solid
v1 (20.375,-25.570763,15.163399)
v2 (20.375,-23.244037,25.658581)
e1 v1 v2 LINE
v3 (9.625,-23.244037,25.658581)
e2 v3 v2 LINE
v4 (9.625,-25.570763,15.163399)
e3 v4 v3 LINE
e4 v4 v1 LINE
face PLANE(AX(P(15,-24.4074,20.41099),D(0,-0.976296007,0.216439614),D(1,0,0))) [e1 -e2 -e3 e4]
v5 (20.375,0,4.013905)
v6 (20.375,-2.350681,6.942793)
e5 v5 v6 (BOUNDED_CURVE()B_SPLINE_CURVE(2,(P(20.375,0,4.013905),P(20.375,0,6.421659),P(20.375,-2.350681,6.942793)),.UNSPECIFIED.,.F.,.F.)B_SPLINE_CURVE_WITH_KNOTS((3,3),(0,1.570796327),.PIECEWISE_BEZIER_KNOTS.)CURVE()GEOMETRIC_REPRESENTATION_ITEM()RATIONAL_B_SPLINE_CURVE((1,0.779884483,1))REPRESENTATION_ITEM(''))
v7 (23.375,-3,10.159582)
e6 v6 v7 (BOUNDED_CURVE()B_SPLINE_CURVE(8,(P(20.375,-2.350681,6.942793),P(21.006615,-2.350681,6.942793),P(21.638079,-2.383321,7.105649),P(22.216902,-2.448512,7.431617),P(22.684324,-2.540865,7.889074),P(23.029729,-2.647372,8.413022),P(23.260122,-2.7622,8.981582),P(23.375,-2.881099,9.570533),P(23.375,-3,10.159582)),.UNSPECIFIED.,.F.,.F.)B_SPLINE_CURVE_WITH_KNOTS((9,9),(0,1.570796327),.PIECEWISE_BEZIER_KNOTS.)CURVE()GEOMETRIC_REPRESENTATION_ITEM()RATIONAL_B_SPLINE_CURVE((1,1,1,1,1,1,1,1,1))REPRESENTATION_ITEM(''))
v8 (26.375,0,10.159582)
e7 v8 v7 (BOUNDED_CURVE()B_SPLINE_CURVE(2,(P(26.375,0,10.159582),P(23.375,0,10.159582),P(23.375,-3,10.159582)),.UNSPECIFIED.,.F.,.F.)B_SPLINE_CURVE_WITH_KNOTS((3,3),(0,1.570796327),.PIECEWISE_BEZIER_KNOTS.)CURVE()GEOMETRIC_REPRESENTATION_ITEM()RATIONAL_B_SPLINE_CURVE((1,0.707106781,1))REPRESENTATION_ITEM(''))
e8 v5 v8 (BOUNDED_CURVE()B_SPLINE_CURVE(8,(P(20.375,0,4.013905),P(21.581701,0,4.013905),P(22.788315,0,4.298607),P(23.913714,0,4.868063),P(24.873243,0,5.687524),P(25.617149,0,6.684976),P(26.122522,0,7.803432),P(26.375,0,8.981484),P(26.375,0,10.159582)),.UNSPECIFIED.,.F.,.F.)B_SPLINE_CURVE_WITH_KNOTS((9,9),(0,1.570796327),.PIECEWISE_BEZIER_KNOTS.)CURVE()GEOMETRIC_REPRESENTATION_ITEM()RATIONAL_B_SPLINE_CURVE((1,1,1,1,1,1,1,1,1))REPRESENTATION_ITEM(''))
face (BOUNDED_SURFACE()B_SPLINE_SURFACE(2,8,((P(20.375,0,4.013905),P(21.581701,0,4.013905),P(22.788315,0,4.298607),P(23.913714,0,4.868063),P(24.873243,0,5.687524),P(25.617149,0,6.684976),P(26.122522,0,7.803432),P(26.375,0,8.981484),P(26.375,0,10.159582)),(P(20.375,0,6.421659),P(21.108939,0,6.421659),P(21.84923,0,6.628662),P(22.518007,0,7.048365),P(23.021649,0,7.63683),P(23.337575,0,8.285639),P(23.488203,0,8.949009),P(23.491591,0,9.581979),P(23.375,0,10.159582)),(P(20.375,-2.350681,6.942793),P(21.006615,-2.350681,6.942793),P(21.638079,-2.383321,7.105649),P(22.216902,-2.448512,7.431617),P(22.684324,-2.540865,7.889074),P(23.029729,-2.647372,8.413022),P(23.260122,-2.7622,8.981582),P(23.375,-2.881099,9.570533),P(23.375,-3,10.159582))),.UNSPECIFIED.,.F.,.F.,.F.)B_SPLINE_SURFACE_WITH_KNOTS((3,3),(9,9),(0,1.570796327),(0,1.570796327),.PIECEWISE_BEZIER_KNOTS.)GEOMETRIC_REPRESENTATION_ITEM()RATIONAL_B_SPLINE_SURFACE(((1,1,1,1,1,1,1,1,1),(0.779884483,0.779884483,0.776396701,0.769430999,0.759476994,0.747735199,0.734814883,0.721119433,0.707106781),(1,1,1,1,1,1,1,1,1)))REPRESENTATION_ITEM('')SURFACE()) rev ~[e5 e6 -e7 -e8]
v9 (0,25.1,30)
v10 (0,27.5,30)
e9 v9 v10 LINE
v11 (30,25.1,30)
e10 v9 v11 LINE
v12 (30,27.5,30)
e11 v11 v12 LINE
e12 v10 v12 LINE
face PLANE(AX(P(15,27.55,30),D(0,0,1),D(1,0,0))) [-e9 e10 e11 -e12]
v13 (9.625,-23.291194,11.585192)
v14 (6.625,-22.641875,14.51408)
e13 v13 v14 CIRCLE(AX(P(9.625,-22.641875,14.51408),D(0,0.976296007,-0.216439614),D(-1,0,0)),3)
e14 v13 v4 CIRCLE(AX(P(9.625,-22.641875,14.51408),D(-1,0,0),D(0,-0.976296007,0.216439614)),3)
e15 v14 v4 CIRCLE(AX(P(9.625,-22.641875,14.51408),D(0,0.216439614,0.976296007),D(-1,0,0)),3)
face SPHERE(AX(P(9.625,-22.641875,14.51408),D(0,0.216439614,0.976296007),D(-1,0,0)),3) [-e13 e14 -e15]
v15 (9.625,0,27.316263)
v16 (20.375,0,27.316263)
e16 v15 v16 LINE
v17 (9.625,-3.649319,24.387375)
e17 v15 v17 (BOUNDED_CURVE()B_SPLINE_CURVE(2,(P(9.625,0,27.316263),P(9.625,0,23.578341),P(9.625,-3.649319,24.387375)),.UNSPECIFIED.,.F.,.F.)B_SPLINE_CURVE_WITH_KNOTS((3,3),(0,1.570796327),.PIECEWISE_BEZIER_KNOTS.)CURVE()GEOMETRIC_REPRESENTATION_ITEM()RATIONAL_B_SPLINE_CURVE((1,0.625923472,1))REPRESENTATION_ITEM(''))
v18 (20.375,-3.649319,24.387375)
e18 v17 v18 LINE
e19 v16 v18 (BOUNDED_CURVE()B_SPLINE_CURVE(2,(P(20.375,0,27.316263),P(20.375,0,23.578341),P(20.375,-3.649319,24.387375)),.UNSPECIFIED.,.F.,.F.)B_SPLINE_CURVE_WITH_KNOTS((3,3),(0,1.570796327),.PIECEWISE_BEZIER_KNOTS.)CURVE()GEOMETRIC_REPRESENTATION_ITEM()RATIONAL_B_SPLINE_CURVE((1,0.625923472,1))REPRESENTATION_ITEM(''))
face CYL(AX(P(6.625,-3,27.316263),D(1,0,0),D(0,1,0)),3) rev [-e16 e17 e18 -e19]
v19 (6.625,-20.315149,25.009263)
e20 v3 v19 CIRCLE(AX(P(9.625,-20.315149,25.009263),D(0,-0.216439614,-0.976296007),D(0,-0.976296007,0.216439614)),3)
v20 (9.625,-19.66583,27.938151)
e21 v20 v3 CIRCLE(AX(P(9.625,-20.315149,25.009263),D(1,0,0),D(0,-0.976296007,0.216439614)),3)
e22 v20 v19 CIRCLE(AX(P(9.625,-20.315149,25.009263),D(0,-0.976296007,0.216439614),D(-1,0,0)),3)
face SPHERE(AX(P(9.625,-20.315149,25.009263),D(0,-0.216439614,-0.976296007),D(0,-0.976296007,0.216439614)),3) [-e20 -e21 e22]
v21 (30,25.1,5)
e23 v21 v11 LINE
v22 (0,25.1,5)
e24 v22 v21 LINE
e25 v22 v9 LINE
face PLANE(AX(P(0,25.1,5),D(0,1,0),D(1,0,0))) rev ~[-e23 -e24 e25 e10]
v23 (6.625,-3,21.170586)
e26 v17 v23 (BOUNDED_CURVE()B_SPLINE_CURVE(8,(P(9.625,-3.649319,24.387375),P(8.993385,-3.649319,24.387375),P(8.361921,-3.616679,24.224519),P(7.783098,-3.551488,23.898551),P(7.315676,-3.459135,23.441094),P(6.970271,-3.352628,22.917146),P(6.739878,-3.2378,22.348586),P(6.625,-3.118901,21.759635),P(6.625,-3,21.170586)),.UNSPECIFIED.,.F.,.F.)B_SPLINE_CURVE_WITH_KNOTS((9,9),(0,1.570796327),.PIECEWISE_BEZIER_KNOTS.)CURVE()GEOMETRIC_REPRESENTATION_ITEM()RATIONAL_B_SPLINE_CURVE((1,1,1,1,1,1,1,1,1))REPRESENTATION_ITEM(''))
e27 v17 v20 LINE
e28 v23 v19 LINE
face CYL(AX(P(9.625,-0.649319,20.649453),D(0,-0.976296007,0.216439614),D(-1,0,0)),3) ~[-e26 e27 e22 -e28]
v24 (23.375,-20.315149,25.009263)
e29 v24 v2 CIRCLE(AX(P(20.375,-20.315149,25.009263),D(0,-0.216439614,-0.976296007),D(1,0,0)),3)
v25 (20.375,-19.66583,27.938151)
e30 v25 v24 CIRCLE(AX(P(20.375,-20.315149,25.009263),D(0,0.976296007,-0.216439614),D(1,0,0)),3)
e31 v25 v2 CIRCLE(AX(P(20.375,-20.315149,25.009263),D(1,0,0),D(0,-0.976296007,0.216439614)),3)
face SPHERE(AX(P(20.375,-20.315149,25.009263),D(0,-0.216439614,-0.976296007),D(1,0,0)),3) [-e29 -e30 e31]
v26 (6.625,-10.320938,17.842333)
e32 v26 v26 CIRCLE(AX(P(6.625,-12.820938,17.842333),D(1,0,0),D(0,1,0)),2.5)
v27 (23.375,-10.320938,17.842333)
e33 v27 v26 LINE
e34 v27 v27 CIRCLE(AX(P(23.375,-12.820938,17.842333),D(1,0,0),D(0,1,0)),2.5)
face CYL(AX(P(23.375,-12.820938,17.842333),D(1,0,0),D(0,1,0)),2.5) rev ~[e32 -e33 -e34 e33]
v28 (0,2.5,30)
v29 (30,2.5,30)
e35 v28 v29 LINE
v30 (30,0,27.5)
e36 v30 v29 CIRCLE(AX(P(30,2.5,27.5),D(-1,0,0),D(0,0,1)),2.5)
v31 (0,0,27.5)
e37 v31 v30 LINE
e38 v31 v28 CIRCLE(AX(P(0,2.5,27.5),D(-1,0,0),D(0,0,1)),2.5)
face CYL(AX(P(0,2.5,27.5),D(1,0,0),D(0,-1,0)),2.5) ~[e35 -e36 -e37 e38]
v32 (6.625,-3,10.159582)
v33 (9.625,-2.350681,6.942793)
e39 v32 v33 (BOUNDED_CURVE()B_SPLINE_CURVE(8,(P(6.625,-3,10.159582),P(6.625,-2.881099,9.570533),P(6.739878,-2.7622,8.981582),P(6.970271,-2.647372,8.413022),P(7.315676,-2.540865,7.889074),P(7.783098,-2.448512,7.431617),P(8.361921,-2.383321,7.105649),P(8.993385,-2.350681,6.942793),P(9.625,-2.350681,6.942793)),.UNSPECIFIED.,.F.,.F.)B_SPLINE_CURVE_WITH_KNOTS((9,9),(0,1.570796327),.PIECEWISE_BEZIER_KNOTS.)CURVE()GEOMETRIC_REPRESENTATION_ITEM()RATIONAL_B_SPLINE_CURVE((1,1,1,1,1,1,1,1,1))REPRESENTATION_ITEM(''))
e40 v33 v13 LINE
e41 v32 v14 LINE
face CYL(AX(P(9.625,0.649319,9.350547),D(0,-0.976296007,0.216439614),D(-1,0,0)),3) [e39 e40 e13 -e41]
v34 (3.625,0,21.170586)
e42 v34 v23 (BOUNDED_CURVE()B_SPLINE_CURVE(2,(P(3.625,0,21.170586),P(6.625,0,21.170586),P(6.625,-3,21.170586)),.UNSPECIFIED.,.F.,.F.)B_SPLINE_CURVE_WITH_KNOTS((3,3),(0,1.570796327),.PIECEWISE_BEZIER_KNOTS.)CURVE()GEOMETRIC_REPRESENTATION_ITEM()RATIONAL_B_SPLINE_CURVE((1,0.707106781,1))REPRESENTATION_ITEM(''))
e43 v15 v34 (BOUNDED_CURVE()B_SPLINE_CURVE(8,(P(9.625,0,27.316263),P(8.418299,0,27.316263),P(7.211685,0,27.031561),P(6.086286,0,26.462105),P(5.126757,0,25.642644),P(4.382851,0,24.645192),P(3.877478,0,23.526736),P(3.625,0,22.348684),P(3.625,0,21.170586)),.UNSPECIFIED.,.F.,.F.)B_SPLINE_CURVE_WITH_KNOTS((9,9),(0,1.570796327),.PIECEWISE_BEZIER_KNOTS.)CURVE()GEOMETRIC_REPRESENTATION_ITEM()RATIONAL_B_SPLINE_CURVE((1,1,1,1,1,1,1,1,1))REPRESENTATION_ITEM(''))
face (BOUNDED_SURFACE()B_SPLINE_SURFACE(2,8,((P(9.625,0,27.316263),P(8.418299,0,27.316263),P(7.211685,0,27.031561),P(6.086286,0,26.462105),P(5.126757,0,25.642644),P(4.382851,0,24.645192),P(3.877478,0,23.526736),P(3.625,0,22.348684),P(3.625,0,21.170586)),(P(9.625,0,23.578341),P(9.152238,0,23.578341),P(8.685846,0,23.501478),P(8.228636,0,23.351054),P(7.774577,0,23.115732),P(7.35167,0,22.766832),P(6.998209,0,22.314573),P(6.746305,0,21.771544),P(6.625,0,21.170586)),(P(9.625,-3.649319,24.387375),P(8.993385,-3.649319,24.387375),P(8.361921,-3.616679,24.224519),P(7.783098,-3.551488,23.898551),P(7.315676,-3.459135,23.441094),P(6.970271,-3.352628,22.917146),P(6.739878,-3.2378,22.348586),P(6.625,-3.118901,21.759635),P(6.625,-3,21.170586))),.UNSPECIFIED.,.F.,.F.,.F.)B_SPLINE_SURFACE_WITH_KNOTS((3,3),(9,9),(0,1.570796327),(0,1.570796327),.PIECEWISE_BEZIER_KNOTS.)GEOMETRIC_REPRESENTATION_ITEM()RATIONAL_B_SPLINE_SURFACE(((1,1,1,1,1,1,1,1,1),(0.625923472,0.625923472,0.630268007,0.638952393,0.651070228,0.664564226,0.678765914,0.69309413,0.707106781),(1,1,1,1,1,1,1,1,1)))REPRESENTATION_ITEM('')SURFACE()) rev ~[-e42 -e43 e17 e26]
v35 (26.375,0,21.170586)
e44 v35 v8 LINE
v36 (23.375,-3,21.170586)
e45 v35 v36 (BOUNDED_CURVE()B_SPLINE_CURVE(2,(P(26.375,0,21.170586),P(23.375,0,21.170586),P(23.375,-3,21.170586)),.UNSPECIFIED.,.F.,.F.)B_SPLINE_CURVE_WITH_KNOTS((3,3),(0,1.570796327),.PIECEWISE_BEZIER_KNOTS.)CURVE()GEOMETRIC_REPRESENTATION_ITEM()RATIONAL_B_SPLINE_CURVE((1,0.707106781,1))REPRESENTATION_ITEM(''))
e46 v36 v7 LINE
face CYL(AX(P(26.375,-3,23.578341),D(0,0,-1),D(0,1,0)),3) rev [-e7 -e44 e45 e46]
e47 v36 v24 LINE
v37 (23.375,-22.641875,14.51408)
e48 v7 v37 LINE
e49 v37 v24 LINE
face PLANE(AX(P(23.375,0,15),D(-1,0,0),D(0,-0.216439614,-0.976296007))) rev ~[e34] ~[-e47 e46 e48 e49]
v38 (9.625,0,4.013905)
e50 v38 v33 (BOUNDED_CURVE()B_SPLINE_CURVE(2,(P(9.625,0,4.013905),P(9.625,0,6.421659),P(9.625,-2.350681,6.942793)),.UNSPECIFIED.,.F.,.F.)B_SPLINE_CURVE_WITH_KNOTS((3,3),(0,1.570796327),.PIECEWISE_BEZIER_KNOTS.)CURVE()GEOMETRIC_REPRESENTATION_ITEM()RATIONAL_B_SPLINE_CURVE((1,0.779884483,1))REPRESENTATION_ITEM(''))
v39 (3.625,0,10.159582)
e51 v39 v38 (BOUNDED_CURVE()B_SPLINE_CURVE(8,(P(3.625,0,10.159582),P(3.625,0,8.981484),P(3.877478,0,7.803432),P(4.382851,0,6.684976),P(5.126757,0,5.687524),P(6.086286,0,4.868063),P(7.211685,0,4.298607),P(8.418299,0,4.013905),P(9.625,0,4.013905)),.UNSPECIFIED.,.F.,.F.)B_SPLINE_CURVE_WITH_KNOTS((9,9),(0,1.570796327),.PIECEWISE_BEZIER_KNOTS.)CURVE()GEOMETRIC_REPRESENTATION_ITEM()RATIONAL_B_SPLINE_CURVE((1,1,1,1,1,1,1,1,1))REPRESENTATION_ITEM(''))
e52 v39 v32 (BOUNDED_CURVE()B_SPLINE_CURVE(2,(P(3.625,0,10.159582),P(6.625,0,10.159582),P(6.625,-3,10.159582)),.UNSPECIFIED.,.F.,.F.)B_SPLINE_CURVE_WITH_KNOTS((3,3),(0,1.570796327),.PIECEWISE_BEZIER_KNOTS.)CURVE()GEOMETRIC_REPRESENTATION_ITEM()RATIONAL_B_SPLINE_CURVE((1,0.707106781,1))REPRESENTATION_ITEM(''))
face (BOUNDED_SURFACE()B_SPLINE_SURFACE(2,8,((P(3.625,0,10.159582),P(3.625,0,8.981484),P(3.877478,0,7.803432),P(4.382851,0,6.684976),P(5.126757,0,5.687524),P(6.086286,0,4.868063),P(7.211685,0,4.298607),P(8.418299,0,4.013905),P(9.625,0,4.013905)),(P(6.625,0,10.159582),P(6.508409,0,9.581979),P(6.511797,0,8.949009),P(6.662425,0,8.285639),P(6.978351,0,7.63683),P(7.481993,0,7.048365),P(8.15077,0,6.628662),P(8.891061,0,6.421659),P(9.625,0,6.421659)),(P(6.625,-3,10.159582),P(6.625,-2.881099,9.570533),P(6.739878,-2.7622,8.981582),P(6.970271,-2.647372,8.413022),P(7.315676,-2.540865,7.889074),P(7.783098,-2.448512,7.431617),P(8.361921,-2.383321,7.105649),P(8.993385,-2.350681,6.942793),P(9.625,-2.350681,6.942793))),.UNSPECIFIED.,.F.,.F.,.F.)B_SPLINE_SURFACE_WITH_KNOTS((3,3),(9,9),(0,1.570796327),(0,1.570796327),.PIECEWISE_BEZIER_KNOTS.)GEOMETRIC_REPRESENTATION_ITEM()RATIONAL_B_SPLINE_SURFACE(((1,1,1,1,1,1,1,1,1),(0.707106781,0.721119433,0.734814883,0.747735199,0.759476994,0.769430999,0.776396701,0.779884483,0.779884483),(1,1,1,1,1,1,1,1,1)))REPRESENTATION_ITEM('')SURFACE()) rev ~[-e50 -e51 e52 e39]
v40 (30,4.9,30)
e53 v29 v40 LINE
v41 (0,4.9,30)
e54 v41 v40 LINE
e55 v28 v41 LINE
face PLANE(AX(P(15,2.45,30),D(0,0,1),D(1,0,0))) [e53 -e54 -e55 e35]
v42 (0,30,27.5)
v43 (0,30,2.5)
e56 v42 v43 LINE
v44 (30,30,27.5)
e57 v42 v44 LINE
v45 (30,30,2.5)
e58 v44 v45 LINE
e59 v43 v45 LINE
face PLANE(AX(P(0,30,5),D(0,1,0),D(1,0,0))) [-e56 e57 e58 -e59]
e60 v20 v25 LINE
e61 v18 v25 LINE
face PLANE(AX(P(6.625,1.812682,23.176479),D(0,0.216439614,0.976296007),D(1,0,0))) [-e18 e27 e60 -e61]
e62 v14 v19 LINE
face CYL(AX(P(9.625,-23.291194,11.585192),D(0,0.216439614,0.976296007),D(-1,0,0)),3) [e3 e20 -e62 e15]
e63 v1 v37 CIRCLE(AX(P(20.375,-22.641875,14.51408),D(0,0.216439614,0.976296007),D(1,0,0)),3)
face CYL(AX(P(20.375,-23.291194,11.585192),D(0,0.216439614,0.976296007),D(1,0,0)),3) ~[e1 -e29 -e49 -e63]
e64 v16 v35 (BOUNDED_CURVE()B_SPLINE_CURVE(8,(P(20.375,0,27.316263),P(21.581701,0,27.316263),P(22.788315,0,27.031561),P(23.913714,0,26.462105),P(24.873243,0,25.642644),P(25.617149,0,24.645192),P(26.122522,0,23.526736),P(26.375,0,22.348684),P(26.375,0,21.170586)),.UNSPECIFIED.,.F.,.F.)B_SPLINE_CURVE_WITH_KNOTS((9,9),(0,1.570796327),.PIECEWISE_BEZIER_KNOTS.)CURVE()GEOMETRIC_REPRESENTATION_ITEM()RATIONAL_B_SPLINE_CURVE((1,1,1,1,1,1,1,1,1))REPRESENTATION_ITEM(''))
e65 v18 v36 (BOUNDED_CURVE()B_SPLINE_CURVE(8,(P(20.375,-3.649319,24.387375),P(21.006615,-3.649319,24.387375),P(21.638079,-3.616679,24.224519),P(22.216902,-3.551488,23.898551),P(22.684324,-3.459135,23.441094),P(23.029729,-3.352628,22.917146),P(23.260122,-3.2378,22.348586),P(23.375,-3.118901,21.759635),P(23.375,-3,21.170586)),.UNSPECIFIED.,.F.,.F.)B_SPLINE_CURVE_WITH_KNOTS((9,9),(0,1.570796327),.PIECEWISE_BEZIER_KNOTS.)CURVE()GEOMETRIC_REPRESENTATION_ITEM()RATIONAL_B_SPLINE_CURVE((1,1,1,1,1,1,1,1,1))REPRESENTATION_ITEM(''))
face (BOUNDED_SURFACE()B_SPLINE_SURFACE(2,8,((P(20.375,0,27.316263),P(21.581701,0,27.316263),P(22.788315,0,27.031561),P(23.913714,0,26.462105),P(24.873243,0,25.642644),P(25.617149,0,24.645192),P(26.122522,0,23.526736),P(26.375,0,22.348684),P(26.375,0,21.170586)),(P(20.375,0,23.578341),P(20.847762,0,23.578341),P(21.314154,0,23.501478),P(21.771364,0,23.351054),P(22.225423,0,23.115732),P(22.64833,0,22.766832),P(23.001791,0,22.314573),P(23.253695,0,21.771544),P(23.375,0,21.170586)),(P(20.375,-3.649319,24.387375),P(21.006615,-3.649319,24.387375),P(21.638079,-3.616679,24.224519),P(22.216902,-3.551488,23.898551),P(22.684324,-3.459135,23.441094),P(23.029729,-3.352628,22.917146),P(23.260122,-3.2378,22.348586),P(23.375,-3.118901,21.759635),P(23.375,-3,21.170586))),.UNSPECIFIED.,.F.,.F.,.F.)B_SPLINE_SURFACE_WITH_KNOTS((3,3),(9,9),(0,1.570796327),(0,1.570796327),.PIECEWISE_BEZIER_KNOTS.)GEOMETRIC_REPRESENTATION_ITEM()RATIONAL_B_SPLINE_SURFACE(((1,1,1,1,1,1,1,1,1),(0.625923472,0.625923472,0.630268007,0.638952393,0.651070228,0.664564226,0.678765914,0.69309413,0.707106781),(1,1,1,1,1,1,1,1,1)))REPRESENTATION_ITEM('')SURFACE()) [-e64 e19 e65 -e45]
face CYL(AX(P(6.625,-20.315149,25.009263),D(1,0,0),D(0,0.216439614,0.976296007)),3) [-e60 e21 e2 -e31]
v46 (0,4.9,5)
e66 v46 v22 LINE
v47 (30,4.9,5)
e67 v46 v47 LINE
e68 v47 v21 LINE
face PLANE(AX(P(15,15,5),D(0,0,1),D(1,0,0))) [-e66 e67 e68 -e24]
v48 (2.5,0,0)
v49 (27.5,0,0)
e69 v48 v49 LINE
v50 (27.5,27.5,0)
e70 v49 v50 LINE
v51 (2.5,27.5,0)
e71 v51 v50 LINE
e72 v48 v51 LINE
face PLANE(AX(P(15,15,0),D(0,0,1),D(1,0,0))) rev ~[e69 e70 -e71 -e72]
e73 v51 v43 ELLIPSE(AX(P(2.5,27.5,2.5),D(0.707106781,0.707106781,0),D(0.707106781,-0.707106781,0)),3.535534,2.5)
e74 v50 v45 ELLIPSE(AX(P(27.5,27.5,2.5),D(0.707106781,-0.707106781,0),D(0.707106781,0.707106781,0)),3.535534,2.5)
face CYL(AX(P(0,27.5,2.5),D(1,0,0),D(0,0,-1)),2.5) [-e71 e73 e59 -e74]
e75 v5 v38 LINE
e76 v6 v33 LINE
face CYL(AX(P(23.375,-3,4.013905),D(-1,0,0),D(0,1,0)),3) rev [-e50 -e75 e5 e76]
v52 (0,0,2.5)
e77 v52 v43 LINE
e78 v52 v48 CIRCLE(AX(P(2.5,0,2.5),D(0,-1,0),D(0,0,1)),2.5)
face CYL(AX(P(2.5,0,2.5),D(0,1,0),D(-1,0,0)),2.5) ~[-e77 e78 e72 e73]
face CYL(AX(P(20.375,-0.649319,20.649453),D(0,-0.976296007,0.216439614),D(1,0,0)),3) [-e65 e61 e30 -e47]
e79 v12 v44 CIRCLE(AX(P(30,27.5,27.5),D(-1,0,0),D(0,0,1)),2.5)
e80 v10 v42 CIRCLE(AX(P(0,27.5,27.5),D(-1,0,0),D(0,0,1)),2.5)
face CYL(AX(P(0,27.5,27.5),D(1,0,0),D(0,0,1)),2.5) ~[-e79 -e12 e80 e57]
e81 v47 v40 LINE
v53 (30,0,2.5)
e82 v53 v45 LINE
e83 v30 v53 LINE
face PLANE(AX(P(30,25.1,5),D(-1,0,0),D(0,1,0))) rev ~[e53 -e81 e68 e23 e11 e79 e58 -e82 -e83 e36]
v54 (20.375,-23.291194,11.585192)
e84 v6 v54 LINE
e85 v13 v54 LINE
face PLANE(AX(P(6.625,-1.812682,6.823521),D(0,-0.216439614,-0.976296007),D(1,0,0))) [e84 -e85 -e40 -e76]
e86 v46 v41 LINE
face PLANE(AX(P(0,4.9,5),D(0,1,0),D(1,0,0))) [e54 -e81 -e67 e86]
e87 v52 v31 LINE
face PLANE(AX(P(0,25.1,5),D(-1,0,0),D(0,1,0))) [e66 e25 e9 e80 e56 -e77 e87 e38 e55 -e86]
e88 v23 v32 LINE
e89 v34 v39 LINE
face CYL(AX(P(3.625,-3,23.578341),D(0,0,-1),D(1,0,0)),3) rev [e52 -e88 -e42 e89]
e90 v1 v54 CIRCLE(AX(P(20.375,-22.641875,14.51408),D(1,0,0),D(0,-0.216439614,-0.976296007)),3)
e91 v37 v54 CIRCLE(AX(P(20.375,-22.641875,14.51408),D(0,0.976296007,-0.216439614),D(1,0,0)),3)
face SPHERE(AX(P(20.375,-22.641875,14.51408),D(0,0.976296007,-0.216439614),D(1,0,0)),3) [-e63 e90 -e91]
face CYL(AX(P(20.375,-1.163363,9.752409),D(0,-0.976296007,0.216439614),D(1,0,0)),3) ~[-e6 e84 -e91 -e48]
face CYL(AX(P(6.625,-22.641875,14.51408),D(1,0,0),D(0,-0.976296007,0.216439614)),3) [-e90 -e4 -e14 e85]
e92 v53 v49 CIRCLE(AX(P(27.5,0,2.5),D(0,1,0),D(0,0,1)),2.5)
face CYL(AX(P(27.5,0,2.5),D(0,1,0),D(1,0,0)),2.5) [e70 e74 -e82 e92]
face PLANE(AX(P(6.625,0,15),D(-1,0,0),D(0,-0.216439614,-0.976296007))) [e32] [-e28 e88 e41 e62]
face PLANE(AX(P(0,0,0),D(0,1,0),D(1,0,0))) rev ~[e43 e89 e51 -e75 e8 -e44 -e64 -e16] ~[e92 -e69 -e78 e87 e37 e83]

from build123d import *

# Parameters (mm, degrees)
F0_W      = 30
F0_H      = 30
F1_DEPTH  = 5
F2_W      = 30
F2_H      = 4.9
F3_DEPTH  = 25
F6_W      = 16.75
F6_H      = 16.75
F7_DEPTH  = 25
F7_FACE_W = 16.75
F7_FACE_H = 8.375
F9_R      = 3
F10_R     = 2.5
F12_R     = 2.5
F13_DEPTH = 16.75


# Not quite as in the source:
# - two fillets or chamfers of one size are made in one step
# - a feature names something its author has since deleted; it is built from what else it names


with BuildPart() as f1:
    # F0 (on Top) → F1 (new body)
    with BuildSketch(Plane.XY):
        with Locations((15, 15)):
            Rectangle(F0_W, F0_H)
    extrude(amount=F1_DEPTH)

    # F2 (on face) → F3 (join)
    with BuildSketch(Plane.XY.offset(5)):
        with Locations((15, 27.55)):
            Rectangle(F2_W, F2_H)
        with Locations((15, 2.45)):
            Rectangle(F2_W, F2_H)
    extrude(amount=F3_DEPTH)

    # F6 (on line) → F7 (join)
    with BuildSketch(Plane(origin=(0, -3.1696369631, 0.7026915972), x_dir=(1, 0, 0), z_dir=(0, -0.9762960071, 0.2164396139))):
        with Locations((15, 14.6444401068)):
            Rectangle(F6_W, F6_H)
    extrude(amount=F7_DEPTH)

    # F7_face (on face) → F8 (join, up to the next surface of F1)
    with BuildSketch(Plane(origin=(15, -0.9063408834, 10.9117604702), x_dir=(1, 0, 0), z_dir=(0, 0.9762960071, -0.2164396139))):
        Rectangle(F7_FACE_W, F7_FACE_H)
    extrude(until=Until.NEXT)

    # F9
    f9_edges = [f1.edges().sort_by_distance(p)[0] for p in [
        (6.625, -24.4074, 20.41099),
        (23.375, 0, 15),
        (23.375, -13.110041, 9.328085),
        (23.375, -24.4074, 20.41099),
        (23.375, -11.297359, 26.082905),
        (15, 0, 23.578341),
        (6.625, 0, 15),
        (15, 0, 6.421659),
        (6.625, -13.110041, 9.328085),
        (15, -26.220082, 12.234511),
        (15, -22.594718, 28.587469),
        (6.625, -11.297359, 26.082905),
    ]]
    fillet(f9_edges, radius=F9_R)

    # F10
    f10_edges = [f1.edges().sort_by_distance(p)[0] for p in [
        (15, 30, 30),
        (15, 0, 30),
        (15, 30, 0),
        (30, 15, 0),
        (0, 15, 0),
    ]]
    fillet(f10_edges, radius=F10_R)

    # F12 (on face) → F13 (cut, through all)
    with BuildSketch(Plane.YZ.offset(23.375)):
        with Locations((-12.8209375408, 17.8423334229)):
            Circle(F12_R)
    extrude(amount=-F13_DEPTH, mode=Mode.SUBTRACT)


solid = f1.part
